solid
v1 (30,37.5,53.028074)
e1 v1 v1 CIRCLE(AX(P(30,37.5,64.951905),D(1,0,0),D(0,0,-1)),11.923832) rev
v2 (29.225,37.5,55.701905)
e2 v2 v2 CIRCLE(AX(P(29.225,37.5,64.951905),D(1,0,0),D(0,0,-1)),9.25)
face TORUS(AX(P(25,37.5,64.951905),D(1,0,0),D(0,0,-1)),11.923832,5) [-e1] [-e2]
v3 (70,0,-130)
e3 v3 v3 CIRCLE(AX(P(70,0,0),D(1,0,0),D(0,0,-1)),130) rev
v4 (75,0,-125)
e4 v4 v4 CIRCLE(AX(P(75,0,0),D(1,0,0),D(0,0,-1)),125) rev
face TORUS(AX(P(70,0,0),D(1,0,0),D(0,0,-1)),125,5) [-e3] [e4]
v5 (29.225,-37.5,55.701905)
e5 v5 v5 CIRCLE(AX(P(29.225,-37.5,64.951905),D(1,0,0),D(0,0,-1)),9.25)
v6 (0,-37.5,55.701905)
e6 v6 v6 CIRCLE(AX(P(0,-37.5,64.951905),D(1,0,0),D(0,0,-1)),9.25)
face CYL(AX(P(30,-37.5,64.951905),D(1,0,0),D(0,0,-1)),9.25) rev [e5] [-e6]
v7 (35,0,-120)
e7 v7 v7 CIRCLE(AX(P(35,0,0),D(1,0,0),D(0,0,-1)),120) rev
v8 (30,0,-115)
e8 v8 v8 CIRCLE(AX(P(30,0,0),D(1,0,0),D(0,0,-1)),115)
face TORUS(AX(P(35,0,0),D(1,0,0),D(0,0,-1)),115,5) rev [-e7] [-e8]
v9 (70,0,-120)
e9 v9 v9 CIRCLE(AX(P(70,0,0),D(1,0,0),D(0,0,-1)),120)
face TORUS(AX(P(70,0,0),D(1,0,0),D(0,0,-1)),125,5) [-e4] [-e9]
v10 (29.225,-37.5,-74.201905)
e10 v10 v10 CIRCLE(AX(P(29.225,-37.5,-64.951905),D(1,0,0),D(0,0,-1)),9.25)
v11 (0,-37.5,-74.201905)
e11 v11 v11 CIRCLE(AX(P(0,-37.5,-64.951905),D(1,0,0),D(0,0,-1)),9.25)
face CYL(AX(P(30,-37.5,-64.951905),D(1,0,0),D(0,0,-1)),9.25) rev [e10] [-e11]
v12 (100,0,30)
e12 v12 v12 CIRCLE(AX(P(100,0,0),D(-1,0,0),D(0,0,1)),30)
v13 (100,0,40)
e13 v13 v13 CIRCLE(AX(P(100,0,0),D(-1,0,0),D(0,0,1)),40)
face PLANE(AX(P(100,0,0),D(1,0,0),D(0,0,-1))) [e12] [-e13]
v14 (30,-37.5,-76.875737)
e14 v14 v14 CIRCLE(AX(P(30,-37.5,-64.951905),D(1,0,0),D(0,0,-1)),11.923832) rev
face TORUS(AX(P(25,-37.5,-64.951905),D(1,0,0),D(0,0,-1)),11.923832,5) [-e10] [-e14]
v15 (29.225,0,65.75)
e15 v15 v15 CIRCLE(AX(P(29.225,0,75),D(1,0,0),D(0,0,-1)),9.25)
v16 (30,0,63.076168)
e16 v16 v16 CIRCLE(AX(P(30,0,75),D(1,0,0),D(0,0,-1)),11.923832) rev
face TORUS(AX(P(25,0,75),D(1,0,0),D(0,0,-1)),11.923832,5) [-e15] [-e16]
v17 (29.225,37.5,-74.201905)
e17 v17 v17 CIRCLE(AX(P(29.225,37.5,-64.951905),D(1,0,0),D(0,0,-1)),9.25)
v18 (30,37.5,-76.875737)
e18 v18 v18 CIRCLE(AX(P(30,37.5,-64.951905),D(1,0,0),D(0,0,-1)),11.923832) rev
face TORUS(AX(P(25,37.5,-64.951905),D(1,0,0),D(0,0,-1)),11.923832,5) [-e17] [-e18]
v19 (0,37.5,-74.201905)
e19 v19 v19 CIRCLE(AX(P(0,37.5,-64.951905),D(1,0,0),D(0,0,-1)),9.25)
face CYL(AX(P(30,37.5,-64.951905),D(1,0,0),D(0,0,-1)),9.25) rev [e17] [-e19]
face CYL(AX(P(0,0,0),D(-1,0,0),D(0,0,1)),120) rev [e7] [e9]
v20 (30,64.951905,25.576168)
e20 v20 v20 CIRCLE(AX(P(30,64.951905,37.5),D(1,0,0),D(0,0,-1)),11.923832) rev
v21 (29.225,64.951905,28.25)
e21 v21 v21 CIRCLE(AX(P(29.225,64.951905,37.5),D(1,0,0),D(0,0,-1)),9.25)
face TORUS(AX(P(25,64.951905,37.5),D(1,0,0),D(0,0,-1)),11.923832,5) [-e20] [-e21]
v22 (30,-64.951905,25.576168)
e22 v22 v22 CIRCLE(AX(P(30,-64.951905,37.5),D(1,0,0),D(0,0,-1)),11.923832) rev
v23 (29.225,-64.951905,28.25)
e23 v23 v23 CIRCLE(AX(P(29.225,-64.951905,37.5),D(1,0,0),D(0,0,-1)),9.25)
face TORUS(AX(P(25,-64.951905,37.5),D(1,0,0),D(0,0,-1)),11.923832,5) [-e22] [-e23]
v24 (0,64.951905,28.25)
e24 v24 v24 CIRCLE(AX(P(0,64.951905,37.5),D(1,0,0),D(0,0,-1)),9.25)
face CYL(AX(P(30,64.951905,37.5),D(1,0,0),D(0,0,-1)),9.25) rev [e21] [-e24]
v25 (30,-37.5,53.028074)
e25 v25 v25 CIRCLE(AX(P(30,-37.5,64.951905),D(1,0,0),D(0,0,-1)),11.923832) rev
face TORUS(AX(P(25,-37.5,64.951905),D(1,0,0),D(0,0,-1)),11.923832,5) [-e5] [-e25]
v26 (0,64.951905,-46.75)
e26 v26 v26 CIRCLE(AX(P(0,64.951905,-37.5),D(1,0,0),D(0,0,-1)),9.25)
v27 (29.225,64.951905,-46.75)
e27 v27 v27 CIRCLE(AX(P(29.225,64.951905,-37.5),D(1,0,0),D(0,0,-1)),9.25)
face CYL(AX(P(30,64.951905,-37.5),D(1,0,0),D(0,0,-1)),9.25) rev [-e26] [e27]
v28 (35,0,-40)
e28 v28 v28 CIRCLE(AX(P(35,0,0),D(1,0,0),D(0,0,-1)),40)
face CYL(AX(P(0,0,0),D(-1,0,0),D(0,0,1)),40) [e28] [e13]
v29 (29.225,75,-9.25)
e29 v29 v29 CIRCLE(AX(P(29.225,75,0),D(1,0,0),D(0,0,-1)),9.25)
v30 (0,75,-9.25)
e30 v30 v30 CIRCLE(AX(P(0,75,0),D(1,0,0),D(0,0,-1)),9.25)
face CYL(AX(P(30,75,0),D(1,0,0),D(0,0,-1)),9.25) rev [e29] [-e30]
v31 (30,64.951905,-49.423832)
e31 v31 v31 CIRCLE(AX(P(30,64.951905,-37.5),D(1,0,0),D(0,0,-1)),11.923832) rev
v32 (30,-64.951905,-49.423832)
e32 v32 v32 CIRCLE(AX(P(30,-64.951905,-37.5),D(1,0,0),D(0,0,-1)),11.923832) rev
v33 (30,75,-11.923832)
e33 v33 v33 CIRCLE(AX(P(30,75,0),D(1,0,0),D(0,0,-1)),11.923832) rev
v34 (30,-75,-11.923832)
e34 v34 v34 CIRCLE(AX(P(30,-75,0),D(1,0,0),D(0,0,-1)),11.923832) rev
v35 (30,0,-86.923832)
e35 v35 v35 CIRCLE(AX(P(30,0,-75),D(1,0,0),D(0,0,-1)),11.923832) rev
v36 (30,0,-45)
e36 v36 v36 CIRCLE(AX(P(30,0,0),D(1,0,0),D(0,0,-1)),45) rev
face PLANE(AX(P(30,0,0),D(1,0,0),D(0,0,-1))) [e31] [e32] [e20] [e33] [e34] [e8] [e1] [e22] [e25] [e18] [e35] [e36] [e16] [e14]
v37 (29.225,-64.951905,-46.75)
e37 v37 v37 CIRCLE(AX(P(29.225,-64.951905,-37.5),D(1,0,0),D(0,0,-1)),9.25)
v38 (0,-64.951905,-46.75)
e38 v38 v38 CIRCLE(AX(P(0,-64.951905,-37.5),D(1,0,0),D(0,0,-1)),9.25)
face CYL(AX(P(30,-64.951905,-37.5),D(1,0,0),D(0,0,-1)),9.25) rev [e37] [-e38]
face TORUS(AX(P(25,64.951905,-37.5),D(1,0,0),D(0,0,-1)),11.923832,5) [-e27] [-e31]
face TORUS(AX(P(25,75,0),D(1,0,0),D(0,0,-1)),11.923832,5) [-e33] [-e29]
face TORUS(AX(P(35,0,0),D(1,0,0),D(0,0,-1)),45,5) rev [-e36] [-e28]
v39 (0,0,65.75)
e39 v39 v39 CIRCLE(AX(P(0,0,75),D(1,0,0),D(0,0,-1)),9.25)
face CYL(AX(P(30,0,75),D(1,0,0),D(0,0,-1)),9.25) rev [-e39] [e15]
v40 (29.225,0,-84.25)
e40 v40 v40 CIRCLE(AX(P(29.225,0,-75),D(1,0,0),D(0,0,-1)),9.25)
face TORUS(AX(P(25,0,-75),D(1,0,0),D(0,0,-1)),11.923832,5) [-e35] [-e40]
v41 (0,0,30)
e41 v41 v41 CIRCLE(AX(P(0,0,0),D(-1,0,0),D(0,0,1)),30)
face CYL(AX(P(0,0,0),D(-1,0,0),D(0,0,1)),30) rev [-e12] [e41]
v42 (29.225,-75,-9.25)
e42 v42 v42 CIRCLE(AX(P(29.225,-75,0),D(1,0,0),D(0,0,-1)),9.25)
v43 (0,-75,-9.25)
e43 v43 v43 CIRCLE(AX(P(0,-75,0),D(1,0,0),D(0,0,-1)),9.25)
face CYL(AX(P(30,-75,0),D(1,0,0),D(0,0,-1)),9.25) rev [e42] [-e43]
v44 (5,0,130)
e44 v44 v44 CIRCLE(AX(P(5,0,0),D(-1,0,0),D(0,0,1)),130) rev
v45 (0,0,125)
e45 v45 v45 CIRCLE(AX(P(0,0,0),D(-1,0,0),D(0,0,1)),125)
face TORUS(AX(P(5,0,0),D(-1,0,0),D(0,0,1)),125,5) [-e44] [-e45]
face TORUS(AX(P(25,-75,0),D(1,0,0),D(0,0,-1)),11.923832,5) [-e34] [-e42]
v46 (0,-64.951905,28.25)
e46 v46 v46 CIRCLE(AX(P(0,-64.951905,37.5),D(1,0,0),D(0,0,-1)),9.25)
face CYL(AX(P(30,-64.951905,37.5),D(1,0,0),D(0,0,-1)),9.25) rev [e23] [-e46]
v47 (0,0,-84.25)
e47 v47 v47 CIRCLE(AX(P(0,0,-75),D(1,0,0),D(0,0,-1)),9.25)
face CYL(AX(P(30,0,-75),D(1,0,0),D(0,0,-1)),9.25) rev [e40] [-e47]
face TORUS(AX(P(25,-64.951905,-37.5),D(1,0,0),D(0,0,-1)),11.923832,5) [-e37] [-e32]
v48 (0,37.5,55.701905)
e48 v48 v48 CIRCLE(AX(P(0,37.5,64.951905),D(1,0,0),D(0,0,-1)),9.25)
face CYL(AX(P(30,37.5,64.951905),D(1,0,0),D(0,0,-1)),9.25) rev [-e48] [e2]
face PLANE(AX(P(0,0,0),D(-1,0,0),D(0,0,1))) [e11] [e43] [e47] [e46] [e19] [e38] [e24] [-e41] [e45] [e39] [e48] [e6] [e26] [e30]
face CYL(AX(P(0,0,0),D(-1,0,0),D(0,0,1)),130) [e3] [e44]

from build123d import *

# Parameters (mm, degrees)
M20X1_5_TAPPED_HOLE1_D           = 18.5
M20X1_5_TAPPED_HOLE1_CSINK_D     = 20.05
M20X1_5_TAPPED_HOLE1_CSINK_ANGLE = 90
CIRPATTERN1_COUNT                = 12
FILLET1_R                        = 5


with BuildPart() as part:
    # Sketch3 → Revolve1 (revolve)
    with BuildSketch(Plane.XY, mode=Mode.PRIVATE) as revolve1_sk:
        Polygon((100, 30), (0, 30), (0, 130), (75, 130), (75, 120), (30, 120), (30, 40), (100, 40), align=None)
    revolve(revolve1_sk.sketch.rotate(Axis((0, 0, 0), (1, 0, 0)), 90), axis=Axis((0, 0, 0), (1, 0, 0)))

    # M20x1.5 Tapped Hole1 (through all)
    with Locations(Plane(origin=(30, 0, 0), x_dir=(0, 0, -1), z_dir=(1, 0, 0))):
        with Locations((0, 75)):
            m20x1_5_tapped_hole1 = CounterSinkHole(M20X1_5_TAPPED_HOLE1_D / 2, M20X1_5_TAPPED_HOLE1_CSINK_D / 2, counter_sink_angle=M20X1_5_TAPPED_HOLE1_CSINK_ANGLE)

    # CirPattern1: M20x1.5 Tapped Hole1 ×12 about axis
    cirpattern1_axis = Axis((0, 0, 0), (1, 0, 0))
    for i in range(1, CIRPATTERN1_COUNT):
        add(m20x1_5_tapped_hole1.rotate(cirpattern1_axis, i * 360 / CIRPATTERN1_COUNT), mode=Mode.SUBTRACT)

    # Fillet1
    # the kernel refuses this fillet: 5 mm, written as the material it adds along each edge
    with BuildSketch(Plane(origin=(30, 0, 0), x_dir=(0, 0, 1), z_dir=(0, 1, 0))) as fillet1_piece_1:
        with BuildLine():
            CenterArc((120 - FILLET1_R, FILLET1_R), FILLET1_R, 270, 90)
            Line((120, FILLET1_R), (120, 0))
            Line((120, 0), (120 - FILLET1_R, 0))
        make_face()
    revolve(axis=Axis((30, 0, 0), (1, 0, 0)))
    with BuildSketch(Plane(origin=(30, 0, 0), x_dir=(0, 0, 1), z_dir=(0, 1, 0))) as fillet1_piece_2:
        with BuildLine():
            CenterArc((40 + FILLET1_R, FILLET1_R), FILLET1_R, 180, 90)
            Line((40, FILLET1_R), (40, 0))
            Line((40, 0), (40 + FILLET1_R, 0))
        make_face()
    revolve(axis=Axis((30, 0, 0), (1, 0, 0)))
    # the kernel refuses this fillet: 5 mm, written as the material it takes off along each edge
    with BuildSketch(Plane(origin=(30, 64.951905284, 37.5), x_dir=(0, -0.5000000000000002, 0.8660254037844385), z_dir=(0, -0.8660254037844385, -0.5000000000000002))) as fillet1_2_piece_1:
        with BuildLine():
            CenterArc((11.92383152, 5), FILLET1_R, 237.671935878, 32.328064122)
            Line((11.92383152, 0), (10.025, 0))
            Line((10.025, 0), (9.25, 0.775))
        make_face()
    revolve(axis=Axis((30, 64.951905284, 37.5), (-1, 0, 0)), mode=Mode.SUBTRACT)
    with BuildSketch(Plane(origin=(30, 75, 0), x_dir=(0, 0, 1), z_dir=(0, -1, 0))) as fillet1_2_piece_2:
        with BuildLine():
            CenterArc((11.92383152, 5), FILLET1_R, 237.671935878, 32.328064122)
            Line((11.92383152, 0), (10.025, 0))
            Line((10.025, 0), (9.25, 0.775))
        make_face()
    revolve(axis=Axis((30, 75, 0), (-1, 0, 0)), mode=Mode.SUBTRACT)
    with BuildSketch(Plane(origin=(30, 64.951905284, -37.5), x_dir=(0, 0.5000000000000003, 0.8660254037844385), z_dir=(0, -0.8660254037844385, 0.5000000000000003))) as fillet1_2_piece_3:
        with BuildLine():
            CenterArc((11.92383152, 5), FILLET1_R, 237.671935878, 32.328064122)
            Line((11.92383152, 0), (10.025, 0))
            Line((10.025, 0), (9.25, 0.775))
        make_face()
    revolve(axis=Axis((30, 64.951905284, -37.5), (-1, 0, 0)), mode=Mode.SUBTRACT)
    with BuildSketch(Plane(origin=(30, 37.5, -64.951905284), x_dir=(0, 0.8660254037844385, 0.5000000000000002), z_dir=(0, -0.5000000000000002, 0.8660254037844385))) as fillet1_2_piece_4:
        with BuildLine():
            CenterArc((11.92383152, 5), FILLET1_R, 237.671935878, 32.328064122)
            Line((11.92383152, 0), (10.025, 0))
            Line((10.025, 0), (9.25, 0.775))
        make_face()
    revolve(axis=Axis((30, 37.5, -64.951905284), (-1, 0, 0)), mode=Mode.SUBTRACT)
    with BuildSketch(Plane(origin=(30, 0, -75), x_dir=(0, 1, 0), z_dir=(0, 0, 1))) as fillet1_2_piece_5:
        with BuildLine():
            CenterArc((11.92383152, 5), FILLET1_R, 237.671935878, 32.328064122)
            Line((11.92383152, 0), (10.025, 0))
            Line((10.025, 0), (9.25, 0.775))
        make_face()
    revolve(axis=Axis((30, 0, -75), (-1, 0, 0)), mode=Mode.SUBTRACT)
    with BuildSketch(Plane(origin=(30, -37.5, -64.951905284), x_dir=(0, 0.8660254037844385, -0.5000000000000003), z_dir=(0, 0.5000000000000003, 0.8660254037844385))) as fillet1_2_piece_6:
        with BuildLine():
            CenterArc((11.92383152, 5), FILLET1_R, 237.671935878, 32.328064122)
            Line((11.92383152, 0), (10.025, 0))
            Line((10.025, 0), (9.25, 0.775))
        make_face()
    revolve(axis=Axis((30, -37.5, -64.951905284), (-1, 0, 0)), mode=Mode.SUBTRACT)
    with BuildSketch(Plane(origin=(30, -64.951905284, -37.5), x_dir=(0, 0.5000000000000002, -0.8660254037844385), z_dir=(0, 0.8660254037844385, 0.5000000000000002))) as fillet1_2_piece_7:
        with BuildLine():
            CenterArc((11.92383152, 5), FILLET1_R, 237.671935878, 32.328064122)
            Line((11.92383152, 0), (10.025, 0))
            Line((10.025, 0), (9.25, 0.775))
        make_face()
    revolve(axis=Axis((30, -64.951905284, -37.5), (-1, 0, 0)), mode=Mode.SUBTRACT)
    with BuildSketch(Plane(origin=(30, -75, 0), x_dir=(0, 0, -1), z_dir=(0, 1, 0))) as fillet1_2_piece_8:
        with BuildLine():
            CenterArc((11.92383152, 5), FILLET1_R, 237.671935878, 32.328064122)
            Line((11.92383152, 0), (10.025, 0))
            Line((10.025, 0), (9.25, 0.775))
        make_face()
    revolve(axis=Axis((30, -75, 0), (-1, 0, 0)), mode=Mode.SUBTRACT)
    with BuildSketch(Plane(origin=(30, -64.951905284, 37.5), x_dir=(0, -0.5000000000000002, -0.8660254037844385), z_dir=(0, 0.8660254037844385, -0.5000000000000002))) as fillet1_2_piece_9:
        with BuildLine():
            CenterArc((11.92383152, 5), FILLET1_R, 237.671935878, 32.328064122)
            Line((11.92383152, 0), (10.025, 0))
            Line((10.025, 0), (9.25, 0.775))
        make_face()
    revolve(axis=Axis((30, -64.951905284, 37.5), (-1, 0, 0)), mode=Mode.SUBTRACT)
    with BuildSketch(Plane(origin=(0, 0, 0), x_dir=(0, 0, 1), z_dir=(0, 1, 0))) as fillet1_2_piece_10:
        with BuildLine():
            CenterArc((130 - FILLET1_R, FILLET1_R), FILLET1_R, 270, 90)
            Line((130, FILLET1_R), (130, 0))
            Line((130, 0), (130 - FILLET1_R, 0))
        make_face()
    revolve(axis=Axis((0, 0, 0), (1, 0, 0)), mode=Mode.SUBTRACT)
    with BuildSketch(Plane(origin=(30, -37.5, 64.951905284), x_dir=(0, -0.8660254037844388, -0.49999999999999967), z_dir=(0, 0.49999999999999967, -0.8660254037844388))) as fillet1_2_piece_11:
        with BuildLine():
            CenterArc((11.92383152, 5), FILLET1_R, 237.671935878, 32.328064122)
            Line((11.92383152, 0), (10.025, 0))
            Line((10.025, 0), (9.25, 0.775))
        make_face()
    revolve(axis=Axis((30, -37.5, 64.951905284), (-1, 0, 0)), mode=Mode.SUBTRACT)
    with BuildSketch(Plane(origin=(75, 0, 0), x_dir=(0, 0, 1), z_dir=(0, 1, 0))) as fillet1_2_piece_12:
        with BuildLine():
            CenterArc((130 - FILLET1_R, -FILLET1_R), FILLET1_R, 0, 90)
            Line((130 - FILLET1_R, 0), (130, 0))
            Line((130, 0), (130, -FILLET1_R))
        make_face()
    revolve(axis=Axis((75, 0, 0), (1, 0, 0)), mode=Mode.SUBTRACT)
    with BuildSketch(Plane(origin=(30, 0, 75), x_dir=(0, -1, 0), z_dir=(0, 0, -1))) as fillet1_2_piece_13:
        with BuildLine():
            CenterArc((11.92383152, 5), FILLET1_R, 237.671935878, 32.328064122)
            Line((11.92383152, 0), (10.025, 0))
            Line((10.025, 0), (9.25, 0.775))
        make_face()
    revolve(axis=Axis((30, 0, 75), (-1, 0, 0)), mode=Mode.SUBTRACT)
    with BuildSketch(Plane(origin=(75, 0, 0), x_dir=(0, 0, 1), z_dir=(0, 1, 0))) as fillet1_2_piece_14:
        with BuildLine():
            CenterArc((120 + FILLET1_R, -FILLET1_R), FILLET1_R, 90, 90)
            Line((120, -FILLET1_R), (120, 0))
            Line((120, 0), (120 + FILLET1_R, 0))
        make_face()
    revolve(axis=Axis((75, 0, 0), (1, 0, 0)), mode=Mode.SUBTRACT)
    with BuildSketch(Plane(origin=(30, 37.5, 64.951905284), x_dir=(0, -0.8660254037844385, 0.5000000000000002), z_dir=(0, -0.5000000000000002, -0.8660254037844385))) as fillet1_2_piece_15:
        with BuildLine():
            CenterArc((11.92383152, 5), FILLET1_R, 237.671935878, 32.328064122)
            Line((11.92383152, 0), (10.025, 0))
            Line((10.025, 0), (9.25, 0.775))
        make_face()
    revolve(axis=Axis((30, 37.5, 64.951905284), (-1, 0, 0)), mode=Mode.SUBTRACT)


solid = part.part
